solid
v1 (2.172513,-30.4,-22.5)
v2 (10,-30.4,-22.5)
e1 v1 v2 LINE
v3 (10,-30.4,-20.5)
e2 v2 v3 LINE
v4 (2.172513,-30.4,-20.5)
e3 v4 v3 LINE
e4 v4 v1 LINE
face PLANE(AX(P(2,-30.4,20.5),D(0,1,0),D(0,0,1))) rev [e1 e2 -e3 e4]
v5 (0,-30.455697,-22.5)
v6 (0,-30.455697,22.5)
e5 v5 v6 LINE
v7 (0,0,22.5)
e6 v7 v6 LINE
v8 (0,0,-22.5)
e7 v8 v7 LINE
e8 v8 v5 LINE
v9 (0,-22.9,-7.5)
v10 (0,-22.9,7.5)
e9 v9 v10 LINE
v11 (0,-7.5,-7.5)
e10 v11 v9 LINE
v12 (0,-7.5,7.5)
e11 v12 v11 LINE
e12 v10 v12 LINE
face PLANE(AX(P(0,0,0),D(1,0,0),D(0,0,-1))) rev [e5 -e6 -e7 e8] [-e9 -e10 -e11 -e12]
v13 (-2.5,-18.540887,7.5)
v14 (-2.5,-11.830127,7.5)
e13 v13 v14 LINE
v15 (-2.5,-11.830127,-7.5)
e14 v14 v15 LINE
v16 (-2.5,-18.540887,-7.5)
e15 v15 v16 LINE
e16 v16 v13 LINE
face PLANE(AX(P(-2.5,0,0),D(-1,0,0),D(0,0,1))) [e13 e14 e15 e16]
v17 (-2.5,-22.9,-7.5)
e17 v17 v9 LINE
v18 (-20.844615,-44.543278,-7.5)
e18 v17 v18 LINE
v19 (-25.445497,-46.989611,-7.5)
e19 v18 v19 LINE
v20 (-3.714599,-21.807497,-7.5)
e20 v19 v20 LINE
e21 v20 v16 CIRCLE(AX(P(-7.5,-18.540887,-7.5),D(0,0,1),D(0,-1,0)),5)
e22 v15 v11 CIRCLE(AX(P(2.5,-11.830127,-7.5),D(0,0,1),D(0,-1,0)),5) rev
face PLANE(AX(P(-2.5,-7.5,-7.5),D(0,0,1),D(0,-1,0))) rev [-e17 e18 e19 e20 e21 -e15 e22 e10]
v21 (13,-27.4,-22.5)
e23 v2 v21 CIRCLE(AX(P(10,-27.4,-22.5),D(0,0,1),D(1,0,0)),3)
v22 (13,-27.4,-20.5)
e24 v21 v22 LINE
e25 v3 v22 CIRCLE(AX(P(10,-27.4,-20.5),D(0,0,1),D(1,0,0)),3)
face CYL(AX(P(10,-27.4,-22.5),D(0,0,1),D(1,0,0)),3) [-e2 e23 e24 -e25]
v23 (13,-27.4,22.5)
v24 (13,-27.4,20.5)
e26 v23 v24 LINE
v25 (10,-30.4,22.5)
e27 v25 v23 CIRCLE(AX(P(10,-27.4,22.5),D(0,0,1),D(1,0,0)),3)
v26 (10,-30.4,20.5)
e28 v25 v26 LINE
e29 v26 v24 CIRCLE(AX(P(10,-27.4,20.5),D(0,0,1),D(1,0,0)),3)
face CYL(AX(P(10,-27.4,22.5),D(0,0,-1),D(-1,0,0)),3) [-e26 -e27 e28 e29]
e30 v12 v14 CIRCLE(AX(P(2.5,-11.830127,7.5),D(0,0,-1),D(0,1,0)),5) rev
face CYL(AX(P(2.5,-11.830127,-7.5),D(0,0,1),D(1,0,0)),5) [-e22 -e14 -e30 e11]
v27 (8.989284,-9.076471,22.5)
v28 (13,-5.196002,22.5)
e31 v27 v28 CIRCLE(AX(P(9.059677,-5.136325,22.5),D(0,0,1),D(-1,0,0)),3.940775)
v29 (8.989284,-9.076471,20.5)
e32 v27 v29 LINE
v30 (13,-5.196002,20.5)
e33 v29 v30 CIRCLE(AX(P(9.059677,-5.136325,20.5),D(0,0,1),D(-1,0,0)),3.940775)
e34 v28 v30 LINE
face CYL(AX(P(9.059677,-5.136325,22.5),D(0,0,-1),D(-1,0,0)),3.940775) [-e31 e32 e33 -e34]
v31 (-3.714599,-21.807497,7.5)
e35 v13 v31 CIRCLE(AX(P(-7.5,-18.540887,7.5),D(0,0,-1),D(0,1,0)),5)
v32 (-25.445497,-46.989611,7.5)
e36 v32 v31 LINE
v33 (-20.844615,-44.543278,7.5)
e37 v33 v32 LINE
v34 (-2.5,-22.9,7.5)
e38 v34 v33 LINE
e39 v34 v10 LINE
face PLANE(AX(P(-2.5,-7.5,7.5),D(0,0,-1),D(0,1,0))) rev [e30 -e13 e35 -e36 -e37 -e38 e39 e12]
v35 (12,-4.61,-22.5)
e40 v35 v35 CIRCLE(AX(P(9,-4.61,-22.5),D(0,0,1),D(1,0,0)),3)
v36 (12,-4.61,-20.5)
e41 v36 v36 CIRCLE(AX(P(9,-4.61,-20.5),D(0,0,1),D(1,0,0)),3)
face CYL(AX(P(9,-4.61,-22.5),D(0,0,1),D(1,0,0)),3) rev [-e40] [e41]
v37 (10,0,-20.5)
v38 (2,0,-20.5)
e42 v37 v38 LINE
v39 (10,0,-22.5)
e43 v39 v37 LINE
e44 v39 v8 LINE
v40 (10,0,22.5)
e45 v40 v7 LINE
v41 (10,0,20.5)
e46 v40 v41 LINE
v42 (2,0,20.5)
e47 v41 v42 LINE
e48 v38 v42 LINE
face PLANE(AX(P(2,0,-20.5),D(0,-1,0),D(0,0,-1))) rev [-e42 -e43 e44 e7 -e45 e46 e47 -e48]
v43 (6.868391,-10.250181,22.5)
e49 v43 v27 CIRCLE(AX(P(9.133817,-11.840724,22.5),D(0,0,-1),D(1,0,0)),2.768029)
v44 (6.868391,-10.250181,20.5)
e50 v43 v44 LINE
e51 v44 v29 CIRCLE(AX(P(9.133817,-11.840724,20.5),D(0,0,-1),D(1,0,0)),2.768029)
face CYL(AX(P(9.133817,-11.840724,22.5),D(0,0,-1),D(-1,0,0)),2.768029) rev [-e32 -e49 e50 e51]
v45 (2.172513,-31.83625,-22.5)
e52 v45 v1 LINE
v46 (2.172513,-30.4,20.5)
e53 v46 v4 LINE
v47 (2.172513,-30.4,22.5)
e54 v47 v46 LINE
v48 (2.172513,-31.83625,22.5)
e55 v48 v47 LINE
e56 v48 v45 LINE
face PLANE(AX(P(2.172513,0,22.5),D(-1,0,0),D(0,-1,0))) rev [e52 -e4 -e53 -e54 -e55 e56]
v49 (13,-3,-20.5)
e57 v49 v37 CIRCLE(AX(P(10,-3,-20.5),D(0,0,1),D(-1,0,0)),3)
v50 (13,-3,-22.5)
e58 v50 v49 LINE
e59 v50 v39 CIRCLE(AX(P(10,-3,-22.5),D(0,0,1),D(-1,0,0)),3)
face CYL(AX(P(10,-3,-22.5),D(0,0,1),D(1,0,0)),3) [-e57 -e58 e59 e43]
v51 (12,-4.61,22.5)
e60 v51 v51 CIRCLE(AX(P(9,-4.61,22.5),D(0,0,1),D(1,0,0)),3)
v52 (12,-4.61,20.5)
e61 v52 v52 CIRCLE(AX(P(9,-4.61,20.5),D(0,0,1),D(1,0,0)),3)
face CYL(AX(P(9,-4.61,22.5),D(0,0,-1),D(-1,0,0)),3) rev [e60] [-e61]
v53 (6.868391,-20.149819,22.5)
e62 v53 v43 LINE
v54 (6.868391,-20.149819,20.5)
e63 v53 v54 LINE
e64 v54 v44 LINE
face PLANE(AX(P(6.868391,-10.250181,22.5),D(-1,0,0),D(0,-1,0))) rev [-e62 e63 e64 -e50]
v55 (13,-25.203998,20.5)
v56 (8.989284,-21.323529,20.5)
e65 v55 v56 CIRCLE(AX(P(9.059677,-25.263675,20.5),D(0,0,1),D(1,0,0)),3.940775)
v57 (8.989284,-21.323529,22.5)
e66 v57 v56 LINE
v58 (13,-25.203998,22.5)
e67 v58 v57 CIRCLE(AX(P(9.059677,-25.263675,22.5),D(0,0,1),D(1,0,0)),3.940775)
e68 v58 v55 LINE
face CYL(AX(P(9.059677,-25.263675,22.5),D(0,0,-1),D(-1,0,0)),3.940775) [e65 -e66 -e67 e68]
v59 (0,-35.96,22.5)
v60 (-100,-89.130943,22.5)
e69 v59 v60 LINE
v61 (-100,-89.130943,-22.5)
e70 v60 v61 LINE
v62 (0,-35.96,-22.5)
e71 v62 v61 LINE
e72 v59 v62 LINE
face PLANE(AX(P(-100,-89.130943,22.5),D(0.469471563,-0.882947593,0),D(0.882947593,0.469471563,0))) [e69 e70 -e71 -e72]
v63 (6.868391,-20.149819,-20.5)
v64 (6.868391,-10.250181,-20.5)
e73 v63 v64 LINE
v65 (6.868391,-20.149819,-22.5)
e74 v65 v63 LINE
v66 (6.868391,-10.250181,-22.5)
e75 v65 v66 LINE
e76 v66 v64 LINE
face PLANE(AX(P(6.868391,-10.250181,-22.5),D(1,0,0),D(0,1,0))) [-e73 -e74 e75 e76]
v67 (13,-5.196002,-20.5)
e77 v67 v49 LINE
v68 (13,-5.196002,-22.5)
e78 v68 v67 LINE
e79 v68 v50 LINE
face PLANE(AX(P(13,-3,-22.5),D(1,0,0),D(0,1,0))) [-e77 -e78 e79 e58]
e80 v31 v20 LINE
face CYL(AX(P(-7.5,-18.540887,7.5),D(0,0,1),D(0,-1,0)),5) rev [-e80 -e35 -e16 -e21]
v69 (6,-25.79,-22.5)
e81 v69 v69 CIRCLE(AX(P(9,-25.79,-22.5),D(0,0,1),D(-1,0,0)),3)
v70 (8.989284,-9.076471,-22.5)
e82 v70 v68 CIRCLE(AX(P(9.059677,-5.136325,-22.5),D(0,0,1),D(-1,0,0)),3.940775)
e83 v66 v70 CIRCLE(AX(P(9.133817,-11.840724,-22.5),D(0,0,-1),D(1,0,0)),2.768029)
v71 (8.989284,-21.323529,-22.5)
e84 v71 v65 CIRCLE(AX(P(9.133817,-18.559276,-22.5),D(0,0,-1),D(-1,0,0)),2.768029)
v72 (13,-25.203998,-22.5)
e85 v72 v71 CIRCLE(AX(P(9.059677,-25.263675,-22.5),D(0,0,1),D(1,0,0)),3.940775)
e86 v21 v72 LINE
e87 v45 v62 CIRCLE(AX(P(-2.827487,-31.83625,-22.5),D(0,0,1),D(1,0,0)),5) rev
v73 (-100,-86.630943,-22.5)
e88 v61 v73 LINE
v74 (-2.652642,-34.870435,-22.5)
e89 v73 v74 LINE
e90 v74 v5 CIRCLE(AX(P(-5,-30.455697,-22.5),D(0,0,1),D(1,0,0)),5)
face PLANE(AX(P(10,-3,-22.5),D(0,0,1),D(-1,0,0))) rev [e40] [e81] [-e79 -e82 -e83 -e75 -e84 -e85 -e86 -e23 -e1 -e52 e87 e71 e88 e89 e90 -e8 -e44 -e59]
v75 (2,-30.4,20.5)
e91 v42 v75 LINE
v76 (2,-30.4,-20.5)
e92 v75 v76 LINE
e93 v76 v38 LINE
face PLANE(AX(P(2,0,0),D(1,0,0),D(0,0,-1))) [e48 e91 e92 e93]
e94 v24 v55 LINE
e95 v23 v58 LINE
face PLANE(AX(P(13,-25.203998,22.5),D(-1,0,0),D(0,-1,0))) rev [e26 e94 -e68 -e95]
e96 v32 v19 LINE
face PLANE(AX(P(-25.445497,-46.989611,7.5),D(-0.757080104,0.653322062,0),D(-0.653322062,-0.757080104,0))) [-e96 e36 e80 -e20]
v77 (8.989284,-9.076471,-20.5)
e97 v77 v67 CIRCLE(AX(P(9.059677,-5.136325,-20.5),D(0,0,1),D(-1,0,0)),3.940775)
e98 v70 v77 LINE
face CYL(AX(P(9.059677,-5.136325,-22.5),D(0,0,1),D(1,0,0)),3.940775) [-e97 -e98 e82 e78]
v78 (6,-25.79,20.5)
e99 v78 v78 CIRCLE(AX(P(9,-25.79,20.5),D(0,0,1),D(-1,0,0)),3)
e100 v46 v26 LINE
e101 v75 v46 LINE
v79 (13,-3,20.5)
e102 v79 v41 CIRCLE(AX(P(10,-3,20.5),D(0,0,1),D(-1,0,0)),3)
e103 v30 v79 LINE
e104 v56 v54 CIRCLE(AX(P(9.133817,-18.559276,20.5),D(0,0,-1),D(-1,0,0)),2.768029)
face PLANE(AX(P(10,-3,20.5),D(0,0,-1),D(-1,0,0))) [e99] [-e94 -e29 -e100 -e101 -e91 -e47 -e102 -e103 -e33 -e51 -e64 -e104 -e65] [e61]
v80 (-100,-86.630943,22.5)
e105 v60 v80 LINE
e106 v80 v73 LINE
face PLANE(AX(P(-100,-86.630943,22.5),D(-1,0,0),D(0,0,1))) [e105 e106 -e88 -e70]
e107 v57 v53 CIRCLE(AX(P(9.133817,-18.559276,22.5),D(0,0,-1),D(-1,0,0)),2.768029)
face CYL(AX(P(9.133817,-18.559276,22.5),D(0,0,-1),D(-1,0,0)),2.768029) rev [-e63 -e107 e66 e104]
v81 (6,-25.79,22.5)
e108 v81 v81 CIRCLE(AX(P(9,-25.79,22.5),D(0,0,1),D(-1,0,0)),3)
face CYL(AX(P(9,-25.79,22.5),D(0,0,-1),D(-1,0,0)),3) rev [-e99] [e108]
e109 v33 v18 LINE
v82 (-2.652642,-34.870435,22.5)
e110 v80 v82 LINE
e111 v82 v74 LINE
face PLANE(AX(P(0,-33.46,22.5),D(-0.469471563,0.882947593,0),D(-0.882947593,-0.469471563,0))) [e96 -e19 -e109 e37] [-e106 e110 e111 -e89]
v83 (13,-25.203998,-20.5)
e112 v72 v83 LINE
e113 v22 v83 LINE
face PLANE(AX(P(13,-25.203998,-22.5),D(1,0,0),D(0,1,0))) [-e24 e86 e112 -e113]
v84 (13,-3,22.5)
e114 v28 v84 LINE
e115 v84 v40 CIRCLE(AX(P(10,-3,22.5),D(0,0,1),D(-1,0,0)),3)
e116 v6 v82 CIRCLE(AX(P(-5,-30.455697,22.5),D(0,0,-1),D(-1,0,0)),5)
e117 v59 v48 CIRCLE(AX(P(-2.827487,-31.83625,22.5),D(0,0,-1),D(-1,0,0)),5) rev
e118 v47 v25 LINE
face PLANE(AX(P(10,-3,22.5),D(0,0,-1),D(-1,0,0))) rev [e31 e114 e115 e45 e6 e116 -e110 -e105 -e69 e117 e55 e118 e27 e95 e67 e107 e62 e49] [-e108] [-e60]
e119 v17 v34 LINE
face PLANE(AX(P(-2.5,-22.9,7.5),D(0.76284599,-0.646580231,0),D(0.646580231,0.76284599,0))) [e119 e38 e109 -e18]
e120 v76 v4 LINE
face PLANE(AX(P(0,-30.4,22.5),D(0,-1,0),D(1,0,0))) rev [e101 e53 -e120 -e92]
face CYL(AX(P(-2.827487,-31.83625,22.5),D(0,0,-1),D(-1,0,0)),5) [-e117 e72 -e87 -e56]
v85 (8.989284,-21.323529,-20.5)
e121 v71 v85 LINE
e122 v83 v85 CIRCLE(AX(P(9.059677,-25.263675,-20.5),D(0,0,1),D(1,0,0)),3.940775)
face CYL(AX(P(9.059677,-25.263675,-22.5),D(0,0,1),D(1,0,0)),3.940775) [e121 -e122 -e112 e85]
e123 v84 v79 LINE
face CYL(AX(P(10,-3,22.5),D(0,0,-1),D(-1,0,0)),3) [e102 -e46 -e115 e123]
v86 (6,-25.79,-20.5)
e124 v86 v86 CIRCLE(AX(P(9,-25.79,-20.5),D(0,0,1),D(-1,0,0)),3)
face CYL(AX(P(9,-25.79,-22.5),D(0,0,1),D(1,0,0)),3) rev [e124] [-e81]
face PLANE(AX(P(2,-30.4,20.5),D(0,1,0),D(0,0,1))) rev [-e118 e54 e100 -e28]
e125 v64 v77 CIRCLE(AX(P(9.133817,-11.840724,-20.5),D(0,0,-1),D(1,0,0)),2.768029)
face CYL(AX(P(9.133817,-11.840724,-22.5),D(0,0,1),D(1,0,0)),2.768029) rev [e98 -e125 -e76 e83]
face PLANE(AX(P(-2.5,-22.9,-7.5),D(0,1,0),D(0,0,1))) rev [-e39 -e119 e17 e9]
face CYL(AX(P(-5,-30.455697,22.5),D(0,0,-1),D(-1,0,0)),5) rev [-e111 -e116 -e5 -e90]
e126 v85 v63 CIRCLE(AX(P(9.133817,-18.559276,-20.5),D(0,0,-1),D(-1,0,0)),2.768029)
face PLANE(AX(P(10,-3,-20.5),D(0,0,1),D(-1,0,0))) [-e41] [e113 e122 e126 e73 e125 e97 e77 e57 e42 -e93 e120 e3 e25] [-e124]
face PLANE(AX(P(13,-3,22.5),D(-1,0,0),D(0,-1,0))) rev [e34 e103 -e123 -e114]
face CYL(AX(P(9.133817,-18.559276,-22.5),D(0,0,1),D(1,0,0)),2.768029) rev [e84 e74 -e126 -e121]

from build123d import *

# Parameters (mm, degrees)
ESQUISSE1_W         = 41
ESQUISSE1_H         = 30.4
BOSS_EXTRU_1_DEPTH  = 2
ESQUISSE3_R         = 3
BOSS_EXTRU_2_DEPTH  = 2
ESQUISSE4_W         = 15
ESQUISSE4_H         = 15.4
BOSS_EXTRU_3_DEPTH  = 2.5
BOSS_EXTRU_9_DEPTH  = 45
BOSS_EXTRU_10_DEPTH = 15
ESQUISSE13_W        = 2.172512758
ESQUISSE13_H        = 5.56
BOSS_EXTRU_11_DEPTH = 45
CONG_2_R            = 5
CONG_3_R            = 5
CONG_4_R            = 5


with BuildPart() as part:
    # Esquisse1 → Boss.-Extru.1 (new body)
    with BuildSketch(Plane(origin=(0, 0, 0), x_dir=(0, 0, -1), z_dir=(1, 0, 0))):
        with Locations((0, -15.2)):
            Rectangle(ESQUISSE1_W, ESQUISSE1_H)
    extrude(amount=BOSS_EXTRU_1_DEPTH)

    # Esquisse3 → Boss.-Extru.2 (add)
    with BuildSketch(Plane.XY.offset(20.5)):
        with BuildLine():
            Line((0, 0), (0, -30.4))
            Line((0, -30.4), (10, -30.4))
            ThreePointArc((10, -30.4), (12.121320344, -29.521320344), (13, -27.4))
            Line((13, -27.4), (13, -25.203998005))
            ThreePointArc((13, -25.203998005), (11.799859401, -22.431518929), (8.989283799, -21.323528643))
            ThreePointArc((8.989283799, -21.323528643), (7.793527962, -20.98117775), (6.868390743, -20.149819053))
            Line((6.868390743, -20.149819053), (6.868390743, -10.250180947))
            ThreePointArc((6.868390743, -10.250180947), (7.793527962, -9.41882225), (8.989283799, -9.076471357))
            ThreePointArc((8.989283799, -9.076471357), (11.799859401, -7.968481071), (13, -5.196001995))
            Line((13, -5.196001995), (13, -3))
            ThreePointArc((13, -3), (12.121320344, -0.878679656), (10, 0))
            Line((10, 0), (0, 0))
        make_face()
        with Locations((9, -4.61)):
            Circle(ESQUISSE3_R, mode=Mode.SUBTRACT)
        with Locations(Location((9, -25.79, 0), (0, 0, 180))):
            Circle(ESQUISSE3_R, mode=Mode.SUBTRACT)
    boss_extru_2 = extrude(amount=BOSS_EXTRU_2_DEPTH)

    # Symétrie1: Boss.-Extru.2 across plane
    add(boss_extru_2.mirror(Plane.XY))

    # Esquisse4 → Boss.-Extru.3 (add)
    with BuildSketch(Plane.ZY):
        with Locations((0, -15.2)):
            Rectangle(ESQUISSE4_W, ESQUISSE4_H)
    extrude(amount=BOSS_EXTRU_3_DEPTH)



with BuildPart() as body_2:
    # Esquisse11 → Boss.-Extru.9 (new body)
    with BuildSketch(Plane(origin=(0, 0, -22.5), x_dir=(-1, 0, 0), z_dir=(0, 0, -1))):
        Polygon((100, -86.630943166), (100, -89.130943166), (0, -35.96), (0, -33.46), align=None)
    extrude(amount=-BOSS_EXTRU_9_DEPTH)


with BuildPart() as part_1:
    add(part.part)

    add(body_2.part)  # Boss.-Extru.10 merges body 2
    # Esquisse12 → Boss.-Extru.10 (add)
    with BuildSketch(Plane(origin=(0, 0, -7.5), x_dir=(-1, 0, 0), z_dir=(0, 0, -1))):
        Polygon((2.5, -22.9), (20.844614881, -44.543278331), (25.445497181, -46.989610844), (2.5, -20.4), align=None)
    extrude(amount=-BOSS_EXTRU_10_DEPTH)

    # Esquisse13 → Boss.-Extru.11 (add)
    with BuildSketch(Plane(origin=(0, 0, -22.5), x_dir=(-1, 0, 0), z_dir=(0, 0, -1))):
        with Locations((-1.086256379, -33.18)):
            Rectangle(ESQUISSE13_W, ESQUISSE13_H)
    extrude(amount=-BOSS_EXTRU_11_DEPTH)

    # Congé2
    # the kernel refuses this fillet: 5 mm, written as the material it takes off along each edge
    with BuildSketch(Plane(origin=(2.172512758, -35.96, -32.809375556), x_dir=(0, 1, 0), z_dir=(0, 0, 1))) as cong_2_piece_1:
        with BuildLine():
            CenterArc((4.123750222, 5), CONG_2_R, 214.436842146, 55.563157854)
            Line((0, 2.172512758), (-0.082475004, 2.115963013))
            ThreePointArc((-0.082475004, 2.115963013), (-0.1, 1.086256379), (-0.1, 0))
            Line((-0.1, 0), (0, -0.1))
            Line((0, -0.1), (4.123750222, -0.1))
            Line((4.123750222, -0.1), (4.123750222, 0))
        make_face()
    extrude(amount=65.618751112, mode=Mode.SUBTRACT)

    # Congé3
    cong_3_edges = [part_1.edges().sort_by_distance(p)[0] for p in [
        (0, -33.46, 0),
    ]]
    fillet(cong_3_edges, radius=CONG_3_R)

    # Congé4
    # the kernel refuses this fillet: 5 mm, written as the material it adds along each edge
    with BuildSketch(Plane(origin=(-2.5, -20.4, -7.5), x_dir=(-0.6533220619728018, -0.7570801036479604, 0), z_dir=(0, 0, 1))) as cong_4_piece_1:
        with BuildLine():
            CenterArc((CONG_4_R * 0.3718225826, -CONG_4_R), CONG_4_R, 90, 40.792541927)
            Line((-CONG_4_R * 0.281499479373, -CONG_4_R * 0.242919896352), (0, 0))
            Line((0, 0), (CONG_4_R * 0.3718225826, 0))
        make_face()
    extrude(amount=15)
    # the kernel refuses this fillet: 5 mm, written as the material it takes off along each edge
    with BuildSketch(Plane(origin=(-2.5, -7.5, -18.325317547), x_dir=(1, 0, 0), z_dir=(0, 0, 1))) as cong_4_2_piece_1:
        with BuildLine():
            CenterArc((5, -4.330127019), CONG_4_R, 120, 60)
            Line((0, -4.330127019), (0, 0))
            Line((0, 0), (2.5, 0))
        make_face()
    extrude(amount=36.650635095, mode=Mode.SUBTRACT)


solid = part_1.part
